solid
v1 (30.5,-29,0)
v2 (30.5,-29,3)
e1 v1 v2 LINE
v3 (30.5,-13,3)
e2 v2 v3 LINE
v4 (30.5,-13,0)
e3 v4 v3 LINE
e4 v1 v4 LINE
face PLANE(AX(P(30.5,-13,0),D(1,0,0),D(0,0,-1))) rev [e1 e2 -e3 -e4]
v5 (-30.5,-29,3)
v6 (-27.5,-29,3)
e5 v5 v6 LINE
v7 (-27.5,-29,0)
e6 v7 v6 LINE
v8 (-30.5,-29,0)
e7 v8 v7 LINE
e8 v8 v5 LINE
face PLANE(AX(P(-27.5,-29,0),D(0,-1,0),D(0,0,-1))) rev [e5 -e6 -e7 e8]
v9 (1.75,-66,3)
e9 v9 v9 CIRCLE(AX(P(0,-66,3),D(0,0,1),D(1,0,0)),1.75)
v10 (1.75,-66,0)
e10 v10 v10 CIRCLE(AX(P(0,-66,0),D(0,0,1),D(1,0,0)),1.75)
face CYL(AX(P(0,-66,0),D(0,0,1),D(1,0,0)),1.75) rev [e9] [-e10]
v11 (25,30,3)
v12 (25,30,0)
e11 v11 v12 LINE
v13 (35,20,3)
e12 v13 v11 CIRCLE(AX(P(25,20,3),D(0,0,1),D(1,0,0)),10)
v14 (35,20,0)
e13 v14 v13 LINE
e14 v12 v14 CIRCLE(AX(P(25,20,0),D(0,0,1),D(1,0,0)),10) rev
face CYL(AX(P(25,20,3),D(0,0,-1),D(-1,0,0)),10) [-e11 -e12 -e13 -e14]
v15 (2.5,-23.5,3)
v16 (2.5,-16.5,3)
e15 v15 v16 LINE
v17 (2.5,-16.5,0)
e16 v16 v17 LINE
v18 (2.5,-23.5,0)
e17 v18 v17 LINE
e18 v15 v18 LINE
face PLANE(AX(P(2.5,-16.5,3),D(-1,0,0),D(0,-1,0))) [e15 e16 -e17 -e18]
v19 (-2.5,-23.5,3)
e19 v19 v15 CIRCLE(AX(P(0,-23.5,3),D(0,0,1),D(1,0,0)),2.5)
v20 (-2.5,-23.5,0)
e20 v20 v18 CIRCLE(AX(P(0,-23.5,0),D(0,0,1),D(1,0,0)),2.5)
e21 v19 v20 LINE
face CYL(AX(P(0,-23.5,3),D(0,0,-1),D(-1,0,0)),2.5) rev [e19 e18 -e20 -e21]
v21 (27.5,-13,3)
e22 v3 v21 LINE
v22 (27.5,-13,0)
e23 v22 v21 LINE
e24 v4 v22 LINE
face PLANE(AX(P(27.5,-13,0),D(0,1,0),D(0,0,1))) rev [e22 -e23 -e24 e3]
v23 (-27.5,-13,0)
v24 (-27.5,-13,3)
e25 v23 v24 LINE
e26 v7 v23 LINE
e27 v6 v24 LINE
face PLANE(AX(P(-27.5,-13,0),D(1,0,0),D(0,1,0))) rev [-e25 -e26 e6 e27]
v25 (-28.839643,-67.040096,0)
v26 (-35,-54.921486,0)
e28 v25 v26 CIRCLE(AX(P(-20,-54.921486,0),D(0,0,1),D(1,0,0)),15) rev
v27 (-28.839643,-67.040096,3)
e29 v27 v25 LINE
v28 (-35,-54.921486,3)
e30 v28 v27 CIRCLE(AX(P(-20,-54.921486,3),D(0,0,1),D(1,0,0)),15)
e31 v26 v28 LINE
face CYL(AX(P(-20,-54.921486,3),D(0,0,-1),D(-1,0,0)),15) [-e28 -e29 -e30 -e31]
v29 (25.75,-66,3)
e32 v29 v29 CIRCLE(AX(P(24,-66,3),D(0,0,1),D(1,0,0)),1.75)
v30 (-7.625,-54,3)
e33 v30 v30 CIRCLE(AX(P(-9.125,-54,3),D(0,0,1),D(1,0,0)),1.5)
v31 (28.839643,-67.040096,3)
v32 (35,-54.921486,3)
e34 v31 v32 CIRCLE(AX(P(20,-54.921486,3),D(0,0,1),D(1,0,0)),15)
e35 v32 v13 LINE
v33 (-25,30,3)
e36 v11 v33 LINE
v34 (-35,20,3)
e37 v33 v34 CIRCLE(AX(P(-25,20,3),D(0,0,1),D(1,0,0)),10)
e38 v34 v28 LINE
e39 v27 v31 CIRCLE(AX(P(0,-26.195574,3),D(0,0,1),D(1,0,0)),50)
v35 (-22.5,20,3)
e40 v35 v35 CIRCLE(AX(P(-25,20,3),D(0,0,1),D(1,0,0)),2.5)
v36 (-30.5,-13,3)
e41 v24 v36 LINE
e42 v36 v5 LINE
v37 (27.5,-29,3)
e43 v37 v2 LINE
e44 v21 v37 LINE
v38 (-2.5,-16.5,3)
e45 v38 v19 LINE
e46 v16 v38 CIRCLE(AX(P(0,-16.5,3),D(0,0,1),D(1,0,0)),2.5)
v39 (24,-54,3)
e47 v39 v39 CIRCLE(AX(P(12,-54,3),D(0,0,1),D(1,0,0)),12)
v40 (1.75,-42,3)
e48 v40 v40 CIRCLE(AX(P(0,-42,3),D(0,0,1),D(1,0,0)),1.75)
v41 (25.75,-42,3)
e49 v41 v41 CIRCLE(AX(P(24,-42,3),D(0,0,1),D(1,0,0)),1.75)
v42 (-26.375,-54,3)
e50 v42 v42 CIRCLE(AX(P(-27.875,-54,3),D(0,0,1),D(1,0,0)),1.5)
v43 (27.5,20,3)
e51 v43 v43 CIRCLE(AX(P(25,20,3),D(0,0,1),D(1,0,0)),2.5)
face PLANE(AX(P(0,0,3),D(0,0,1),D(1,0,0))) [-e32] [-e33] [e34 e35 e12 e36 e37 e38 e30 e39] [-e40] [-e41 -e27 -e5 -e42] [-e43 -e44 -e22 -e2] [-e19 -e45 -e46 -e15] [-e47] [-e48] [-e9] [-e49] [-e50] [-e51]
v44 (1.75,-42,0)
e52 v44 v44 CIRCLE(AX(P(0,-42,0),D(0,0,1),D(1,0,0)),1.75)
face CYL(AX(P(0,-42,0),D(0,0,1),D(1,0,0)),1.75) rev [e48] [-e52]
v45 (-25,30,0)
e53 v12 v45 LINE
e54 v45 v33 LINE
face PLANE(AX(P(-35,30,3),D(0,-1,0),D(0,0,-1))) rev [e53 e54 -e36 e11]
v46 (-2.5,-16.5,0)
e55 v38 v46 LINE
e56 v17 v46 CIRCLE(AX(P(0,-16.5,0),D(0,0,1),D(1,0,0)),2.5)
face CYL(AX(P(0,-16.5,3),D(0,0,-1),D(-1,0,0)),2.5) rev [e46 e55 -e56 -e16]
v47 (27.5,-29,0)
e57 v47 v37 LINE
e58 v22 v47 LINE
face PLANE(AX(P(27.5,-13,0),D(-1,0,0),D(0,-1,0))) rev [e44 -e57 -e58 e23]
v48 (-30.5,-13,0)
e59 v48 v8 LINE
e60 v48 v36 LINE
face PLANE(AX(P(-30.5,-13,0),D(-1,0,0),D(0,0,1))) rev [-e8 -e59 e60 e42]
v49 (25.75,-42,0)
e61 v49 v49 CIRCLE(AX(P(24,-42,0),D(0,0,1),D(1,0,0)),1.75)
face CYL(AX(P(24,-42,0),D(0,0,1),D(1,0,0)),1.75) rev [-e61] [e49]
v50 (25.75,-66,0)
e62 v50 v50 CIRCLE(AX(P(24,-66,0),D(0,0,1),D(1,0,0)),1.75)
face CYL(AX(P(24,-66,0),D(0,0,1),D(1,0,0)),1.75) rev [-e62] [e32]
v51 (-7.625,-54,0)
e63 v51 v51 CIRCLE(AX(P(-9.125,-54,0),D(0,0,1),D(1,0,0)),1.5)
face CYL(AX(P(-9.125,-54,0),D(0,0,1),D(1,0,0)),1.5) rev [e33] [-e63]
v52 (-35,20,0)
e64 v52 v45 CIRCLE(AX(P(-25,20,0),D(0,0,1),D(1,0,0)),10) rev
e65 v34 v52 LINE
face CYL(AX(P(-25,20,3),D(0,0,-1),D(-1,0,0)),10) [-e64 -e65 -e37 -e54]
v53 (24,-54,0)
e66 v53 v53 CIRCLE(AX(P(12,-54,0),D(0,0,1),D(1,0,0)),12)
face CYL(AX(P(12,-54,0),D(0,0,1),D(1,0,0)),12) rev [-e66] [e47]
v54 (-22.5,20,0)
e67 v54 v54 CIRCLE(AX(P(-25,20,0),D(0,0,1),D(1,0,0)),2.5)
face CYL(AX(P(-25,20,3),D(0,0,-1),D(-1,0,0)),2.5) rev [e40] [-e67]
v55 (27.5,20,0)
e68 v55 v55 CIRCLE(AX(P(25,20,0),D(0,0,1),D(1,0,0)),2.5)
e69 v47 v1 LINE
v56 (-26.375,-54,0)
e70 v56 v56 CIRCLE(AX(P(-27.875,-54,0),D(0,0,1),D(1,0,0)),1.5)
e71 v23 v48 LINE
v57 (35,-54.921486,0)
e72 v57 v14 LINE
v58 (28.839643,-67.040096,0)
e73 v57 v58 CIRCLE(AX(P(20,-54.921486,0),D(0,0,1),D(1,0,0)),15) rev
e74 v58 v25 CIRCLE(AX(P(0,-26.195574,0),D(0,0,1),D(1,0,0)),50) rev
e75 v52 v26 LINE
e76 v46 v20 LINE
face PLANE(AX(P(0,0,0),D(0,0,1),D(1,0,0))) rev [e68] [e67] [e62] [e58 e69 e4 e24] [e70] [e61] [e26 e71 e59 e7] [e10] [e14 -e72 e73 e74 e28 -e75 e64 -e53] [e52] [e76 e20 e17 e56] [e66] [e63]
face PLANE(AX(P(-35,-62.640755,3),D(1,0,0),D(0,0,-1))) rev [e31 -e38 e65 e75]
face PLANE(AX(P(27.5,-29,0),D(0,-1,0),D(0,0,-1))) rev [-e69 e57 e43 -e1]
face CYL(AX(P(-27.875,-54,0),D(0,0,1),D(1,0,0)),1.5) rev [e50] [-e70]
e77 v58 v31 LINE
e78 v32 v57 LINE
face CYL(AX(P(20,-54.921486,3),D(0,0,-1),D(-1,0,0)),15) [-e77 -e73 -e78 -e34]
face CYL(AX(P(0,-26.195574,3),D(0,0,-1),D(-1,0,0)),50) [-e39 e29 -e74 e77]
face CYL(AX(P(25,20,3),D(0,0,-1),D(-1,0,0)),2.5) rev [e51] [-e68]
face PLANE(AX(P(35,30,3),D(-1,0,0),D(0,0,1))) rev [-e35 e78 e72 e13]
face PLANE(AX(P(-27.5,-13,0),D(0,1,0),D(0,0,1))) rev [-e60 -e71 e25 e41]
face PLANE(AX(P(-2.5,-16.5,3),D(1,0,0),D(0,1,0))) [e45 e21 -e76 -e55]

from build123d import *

# Parameters (mm, degrees)
SKETCH1_R           = 2.5
BOSS_EXTRUDE1_DEPTH = 3
FILLET1_R           = 10
FILLET1_R_2         = 15
FILLET1_R_3         = 50
SKETCH2_R           = 1.75
SKETCH2_R_2         = 12
CUT_EXTRUDE1_DEPTH  = 84.903310475
SKETCH4_W           = 3
SKETCH4_H           = 16
CUT_EXTRUDE3_DEPTH  = 84.903310475
SKETCH9_R           = 1.5
CUT_EXTRUDE4_DEPTH  = 84.903310475


with BuildPart() as part:
    # Sketch1 → Boss-Extrude1 (new body)
    with BuildSketch(Plane.XY):
        Polygon((-35, 30), (35, 30), (35, -62.640754554), (0, -87.640754554), (-35, -62.640754554), align=None)
        with Locations((25, 20)):
            Circle(SKETCH1_R, mode=Mode.SUBTRACT)
        with Locations((-25, 20)):
            Circle(SKETCH1_R, mode=Mode.SUBTRACT)
        with BuildLine():
            Line((2.5, -16.5), (2.5, -23.5))
            ThreePointArc((2.5, -23.5), (0, -26), (-2.5, -23.5))
            Line((-2.5, -23.5), (-2.5, -16.5))
            ThreePointArc((-2.5, -16.5), (0, -14), (2.5, -16.5))
        make_face(mode=Mode.SUBTRACT)
    extrude(amount=BOSS_EXTRUDE1_DEPTH)

    # Fillet1
    # the kernel refuses this fillet: 50, 15, 10 mm, written as the material it takes off along each edge
    with BuildSketch(Plane(origin=(35, 30, -25), x_dir=(-1, 0, 0), z_dir=(0, 0, 1))) as fillet1_piece_1:
        with BuildLine():
            CenterArc((FILLET1_R, FILLET1_R), FILLET1_R, 180, 90)
            Line((0, FILLET1_R), (0, 0))
            Line((0, 0), (FILLET1_R, 0))
        make_face()
    extrude(amount=53, mode=Mode.SUBTRACT)
    with BuildSketch(Plane(origin=(-35, 30, -25), x_dir=(1, 0, 0), z_dir=(0, 0, 1))) as fillet1_piece_2:
        with BuildLine():
            CenterArc((FILLET1_R, -FILLET1_R), FILLET1_R, 90, 90)
            Line((0, -FILLET1_R), (0, 0))
            Line((0, 0), (FILLET1_R, 0))
        make_face()
    extrude(amount=53, mode=Mode.SUBTRACT)
    with BuildSketch(Plane(origin=(-35, -62.640754554, -19.298171073), x_dir=(0.8137334712067342, -0.5812381937190976, 0), z_dir=(0, 0, 1)), Plane(origin=(35, -62.640754554, -19.298171073), x_dir=(0, 1, 0), z_dir=(0, 0, 1))) as fillet1_piece_3:
        with BuildLine():
            CenterArc((FILLET1_R_2 * 0.514617895292, FILLET1_R_2), FILLET1_R_2, 215.537677792, 54.462322208)
            Line((-FILLET1_R_2 * 0.299115575915, FILLET1_R_2 * 0.418761806281), (0, 0))
            Line((0, 0), (FILLET1_R_2 * 0.514617895292, 0))
        make_face()
    extrude(amount=41.596342147, mode=Mode.SUBTRACT)
    with BuildSketch(Plane(origin=(0, -87.640754554, -89.285714286), x_dir=(0.8137334712067352, 0.5812381937190962, 0), z_dir=(0, 0, 1))) as fillet1_piece_4:
        with BuildLine():
            CenterArc((FILLET1_R_3 * 0.714285714286, FILLET1_R_3), FILLET1_R_3, 198.924644416, 71.075355584)
            Line((-FILLET1_R_3 * 0.23166023166, FILLET1_R_3 * 0.675675675676), (0, 0))
            Line((0, 0), (FILLET1_R_3 * 0.714285714286, 0))
        make_face()
    extrude(amount=181.571428571, mode=Mode.SUBTRACT)

    # Sketch2 → Cut-Extrude1 (cut, through all)
    with BuildSketch(Plane.XY.offset(3)):
        with Locations((24, -42)):
            Circle(SKETCH2_R)
        with Locations((0, -42)):
            Circle(SKETCH2_R)
        with Locations((0, -66)):
            Circle(SKETCH2_R)
        with Locations((24, -66)):
            Circle(SKETCH2_R)
        with Locations((12, -54)):
            Circle(SKETCH2_R_2)
    extrude(amount=-CUT_EXTRUDE1_DEPTH, mode=Mode.SUBTRACT)

    # Sketch4 → Cut-Extrude3 (cut, through all)
    with BuildSketch(Plane.XY.offset(3)):
        with Locations((29, -21)):
            Rectangle(SKETCH4_W, SKETCH4_H)
        with Locations((-29, -21)):
            Rectangle(SKETCH4_W, SKETCH4_H)
    extrude(amount=-CUT_EXTRUDE3_DEPTH, mode=Mode.SUBTRACT)

    # Sketch9 → Cut-Extrude4 (cut, through all)
    with BuildSketch(Plane.XY.offset(3)):
        with Locations((-27.875, -54)):
            Circle(SKETCH9_R)
        with Locations((-9.125, -54)):
            Circle(SKETCH9_R)
    extrude(amount=-CUT_EXTRUDE4_DEPTH, mode=Mode.SUBTRACT)


solid = part.part
